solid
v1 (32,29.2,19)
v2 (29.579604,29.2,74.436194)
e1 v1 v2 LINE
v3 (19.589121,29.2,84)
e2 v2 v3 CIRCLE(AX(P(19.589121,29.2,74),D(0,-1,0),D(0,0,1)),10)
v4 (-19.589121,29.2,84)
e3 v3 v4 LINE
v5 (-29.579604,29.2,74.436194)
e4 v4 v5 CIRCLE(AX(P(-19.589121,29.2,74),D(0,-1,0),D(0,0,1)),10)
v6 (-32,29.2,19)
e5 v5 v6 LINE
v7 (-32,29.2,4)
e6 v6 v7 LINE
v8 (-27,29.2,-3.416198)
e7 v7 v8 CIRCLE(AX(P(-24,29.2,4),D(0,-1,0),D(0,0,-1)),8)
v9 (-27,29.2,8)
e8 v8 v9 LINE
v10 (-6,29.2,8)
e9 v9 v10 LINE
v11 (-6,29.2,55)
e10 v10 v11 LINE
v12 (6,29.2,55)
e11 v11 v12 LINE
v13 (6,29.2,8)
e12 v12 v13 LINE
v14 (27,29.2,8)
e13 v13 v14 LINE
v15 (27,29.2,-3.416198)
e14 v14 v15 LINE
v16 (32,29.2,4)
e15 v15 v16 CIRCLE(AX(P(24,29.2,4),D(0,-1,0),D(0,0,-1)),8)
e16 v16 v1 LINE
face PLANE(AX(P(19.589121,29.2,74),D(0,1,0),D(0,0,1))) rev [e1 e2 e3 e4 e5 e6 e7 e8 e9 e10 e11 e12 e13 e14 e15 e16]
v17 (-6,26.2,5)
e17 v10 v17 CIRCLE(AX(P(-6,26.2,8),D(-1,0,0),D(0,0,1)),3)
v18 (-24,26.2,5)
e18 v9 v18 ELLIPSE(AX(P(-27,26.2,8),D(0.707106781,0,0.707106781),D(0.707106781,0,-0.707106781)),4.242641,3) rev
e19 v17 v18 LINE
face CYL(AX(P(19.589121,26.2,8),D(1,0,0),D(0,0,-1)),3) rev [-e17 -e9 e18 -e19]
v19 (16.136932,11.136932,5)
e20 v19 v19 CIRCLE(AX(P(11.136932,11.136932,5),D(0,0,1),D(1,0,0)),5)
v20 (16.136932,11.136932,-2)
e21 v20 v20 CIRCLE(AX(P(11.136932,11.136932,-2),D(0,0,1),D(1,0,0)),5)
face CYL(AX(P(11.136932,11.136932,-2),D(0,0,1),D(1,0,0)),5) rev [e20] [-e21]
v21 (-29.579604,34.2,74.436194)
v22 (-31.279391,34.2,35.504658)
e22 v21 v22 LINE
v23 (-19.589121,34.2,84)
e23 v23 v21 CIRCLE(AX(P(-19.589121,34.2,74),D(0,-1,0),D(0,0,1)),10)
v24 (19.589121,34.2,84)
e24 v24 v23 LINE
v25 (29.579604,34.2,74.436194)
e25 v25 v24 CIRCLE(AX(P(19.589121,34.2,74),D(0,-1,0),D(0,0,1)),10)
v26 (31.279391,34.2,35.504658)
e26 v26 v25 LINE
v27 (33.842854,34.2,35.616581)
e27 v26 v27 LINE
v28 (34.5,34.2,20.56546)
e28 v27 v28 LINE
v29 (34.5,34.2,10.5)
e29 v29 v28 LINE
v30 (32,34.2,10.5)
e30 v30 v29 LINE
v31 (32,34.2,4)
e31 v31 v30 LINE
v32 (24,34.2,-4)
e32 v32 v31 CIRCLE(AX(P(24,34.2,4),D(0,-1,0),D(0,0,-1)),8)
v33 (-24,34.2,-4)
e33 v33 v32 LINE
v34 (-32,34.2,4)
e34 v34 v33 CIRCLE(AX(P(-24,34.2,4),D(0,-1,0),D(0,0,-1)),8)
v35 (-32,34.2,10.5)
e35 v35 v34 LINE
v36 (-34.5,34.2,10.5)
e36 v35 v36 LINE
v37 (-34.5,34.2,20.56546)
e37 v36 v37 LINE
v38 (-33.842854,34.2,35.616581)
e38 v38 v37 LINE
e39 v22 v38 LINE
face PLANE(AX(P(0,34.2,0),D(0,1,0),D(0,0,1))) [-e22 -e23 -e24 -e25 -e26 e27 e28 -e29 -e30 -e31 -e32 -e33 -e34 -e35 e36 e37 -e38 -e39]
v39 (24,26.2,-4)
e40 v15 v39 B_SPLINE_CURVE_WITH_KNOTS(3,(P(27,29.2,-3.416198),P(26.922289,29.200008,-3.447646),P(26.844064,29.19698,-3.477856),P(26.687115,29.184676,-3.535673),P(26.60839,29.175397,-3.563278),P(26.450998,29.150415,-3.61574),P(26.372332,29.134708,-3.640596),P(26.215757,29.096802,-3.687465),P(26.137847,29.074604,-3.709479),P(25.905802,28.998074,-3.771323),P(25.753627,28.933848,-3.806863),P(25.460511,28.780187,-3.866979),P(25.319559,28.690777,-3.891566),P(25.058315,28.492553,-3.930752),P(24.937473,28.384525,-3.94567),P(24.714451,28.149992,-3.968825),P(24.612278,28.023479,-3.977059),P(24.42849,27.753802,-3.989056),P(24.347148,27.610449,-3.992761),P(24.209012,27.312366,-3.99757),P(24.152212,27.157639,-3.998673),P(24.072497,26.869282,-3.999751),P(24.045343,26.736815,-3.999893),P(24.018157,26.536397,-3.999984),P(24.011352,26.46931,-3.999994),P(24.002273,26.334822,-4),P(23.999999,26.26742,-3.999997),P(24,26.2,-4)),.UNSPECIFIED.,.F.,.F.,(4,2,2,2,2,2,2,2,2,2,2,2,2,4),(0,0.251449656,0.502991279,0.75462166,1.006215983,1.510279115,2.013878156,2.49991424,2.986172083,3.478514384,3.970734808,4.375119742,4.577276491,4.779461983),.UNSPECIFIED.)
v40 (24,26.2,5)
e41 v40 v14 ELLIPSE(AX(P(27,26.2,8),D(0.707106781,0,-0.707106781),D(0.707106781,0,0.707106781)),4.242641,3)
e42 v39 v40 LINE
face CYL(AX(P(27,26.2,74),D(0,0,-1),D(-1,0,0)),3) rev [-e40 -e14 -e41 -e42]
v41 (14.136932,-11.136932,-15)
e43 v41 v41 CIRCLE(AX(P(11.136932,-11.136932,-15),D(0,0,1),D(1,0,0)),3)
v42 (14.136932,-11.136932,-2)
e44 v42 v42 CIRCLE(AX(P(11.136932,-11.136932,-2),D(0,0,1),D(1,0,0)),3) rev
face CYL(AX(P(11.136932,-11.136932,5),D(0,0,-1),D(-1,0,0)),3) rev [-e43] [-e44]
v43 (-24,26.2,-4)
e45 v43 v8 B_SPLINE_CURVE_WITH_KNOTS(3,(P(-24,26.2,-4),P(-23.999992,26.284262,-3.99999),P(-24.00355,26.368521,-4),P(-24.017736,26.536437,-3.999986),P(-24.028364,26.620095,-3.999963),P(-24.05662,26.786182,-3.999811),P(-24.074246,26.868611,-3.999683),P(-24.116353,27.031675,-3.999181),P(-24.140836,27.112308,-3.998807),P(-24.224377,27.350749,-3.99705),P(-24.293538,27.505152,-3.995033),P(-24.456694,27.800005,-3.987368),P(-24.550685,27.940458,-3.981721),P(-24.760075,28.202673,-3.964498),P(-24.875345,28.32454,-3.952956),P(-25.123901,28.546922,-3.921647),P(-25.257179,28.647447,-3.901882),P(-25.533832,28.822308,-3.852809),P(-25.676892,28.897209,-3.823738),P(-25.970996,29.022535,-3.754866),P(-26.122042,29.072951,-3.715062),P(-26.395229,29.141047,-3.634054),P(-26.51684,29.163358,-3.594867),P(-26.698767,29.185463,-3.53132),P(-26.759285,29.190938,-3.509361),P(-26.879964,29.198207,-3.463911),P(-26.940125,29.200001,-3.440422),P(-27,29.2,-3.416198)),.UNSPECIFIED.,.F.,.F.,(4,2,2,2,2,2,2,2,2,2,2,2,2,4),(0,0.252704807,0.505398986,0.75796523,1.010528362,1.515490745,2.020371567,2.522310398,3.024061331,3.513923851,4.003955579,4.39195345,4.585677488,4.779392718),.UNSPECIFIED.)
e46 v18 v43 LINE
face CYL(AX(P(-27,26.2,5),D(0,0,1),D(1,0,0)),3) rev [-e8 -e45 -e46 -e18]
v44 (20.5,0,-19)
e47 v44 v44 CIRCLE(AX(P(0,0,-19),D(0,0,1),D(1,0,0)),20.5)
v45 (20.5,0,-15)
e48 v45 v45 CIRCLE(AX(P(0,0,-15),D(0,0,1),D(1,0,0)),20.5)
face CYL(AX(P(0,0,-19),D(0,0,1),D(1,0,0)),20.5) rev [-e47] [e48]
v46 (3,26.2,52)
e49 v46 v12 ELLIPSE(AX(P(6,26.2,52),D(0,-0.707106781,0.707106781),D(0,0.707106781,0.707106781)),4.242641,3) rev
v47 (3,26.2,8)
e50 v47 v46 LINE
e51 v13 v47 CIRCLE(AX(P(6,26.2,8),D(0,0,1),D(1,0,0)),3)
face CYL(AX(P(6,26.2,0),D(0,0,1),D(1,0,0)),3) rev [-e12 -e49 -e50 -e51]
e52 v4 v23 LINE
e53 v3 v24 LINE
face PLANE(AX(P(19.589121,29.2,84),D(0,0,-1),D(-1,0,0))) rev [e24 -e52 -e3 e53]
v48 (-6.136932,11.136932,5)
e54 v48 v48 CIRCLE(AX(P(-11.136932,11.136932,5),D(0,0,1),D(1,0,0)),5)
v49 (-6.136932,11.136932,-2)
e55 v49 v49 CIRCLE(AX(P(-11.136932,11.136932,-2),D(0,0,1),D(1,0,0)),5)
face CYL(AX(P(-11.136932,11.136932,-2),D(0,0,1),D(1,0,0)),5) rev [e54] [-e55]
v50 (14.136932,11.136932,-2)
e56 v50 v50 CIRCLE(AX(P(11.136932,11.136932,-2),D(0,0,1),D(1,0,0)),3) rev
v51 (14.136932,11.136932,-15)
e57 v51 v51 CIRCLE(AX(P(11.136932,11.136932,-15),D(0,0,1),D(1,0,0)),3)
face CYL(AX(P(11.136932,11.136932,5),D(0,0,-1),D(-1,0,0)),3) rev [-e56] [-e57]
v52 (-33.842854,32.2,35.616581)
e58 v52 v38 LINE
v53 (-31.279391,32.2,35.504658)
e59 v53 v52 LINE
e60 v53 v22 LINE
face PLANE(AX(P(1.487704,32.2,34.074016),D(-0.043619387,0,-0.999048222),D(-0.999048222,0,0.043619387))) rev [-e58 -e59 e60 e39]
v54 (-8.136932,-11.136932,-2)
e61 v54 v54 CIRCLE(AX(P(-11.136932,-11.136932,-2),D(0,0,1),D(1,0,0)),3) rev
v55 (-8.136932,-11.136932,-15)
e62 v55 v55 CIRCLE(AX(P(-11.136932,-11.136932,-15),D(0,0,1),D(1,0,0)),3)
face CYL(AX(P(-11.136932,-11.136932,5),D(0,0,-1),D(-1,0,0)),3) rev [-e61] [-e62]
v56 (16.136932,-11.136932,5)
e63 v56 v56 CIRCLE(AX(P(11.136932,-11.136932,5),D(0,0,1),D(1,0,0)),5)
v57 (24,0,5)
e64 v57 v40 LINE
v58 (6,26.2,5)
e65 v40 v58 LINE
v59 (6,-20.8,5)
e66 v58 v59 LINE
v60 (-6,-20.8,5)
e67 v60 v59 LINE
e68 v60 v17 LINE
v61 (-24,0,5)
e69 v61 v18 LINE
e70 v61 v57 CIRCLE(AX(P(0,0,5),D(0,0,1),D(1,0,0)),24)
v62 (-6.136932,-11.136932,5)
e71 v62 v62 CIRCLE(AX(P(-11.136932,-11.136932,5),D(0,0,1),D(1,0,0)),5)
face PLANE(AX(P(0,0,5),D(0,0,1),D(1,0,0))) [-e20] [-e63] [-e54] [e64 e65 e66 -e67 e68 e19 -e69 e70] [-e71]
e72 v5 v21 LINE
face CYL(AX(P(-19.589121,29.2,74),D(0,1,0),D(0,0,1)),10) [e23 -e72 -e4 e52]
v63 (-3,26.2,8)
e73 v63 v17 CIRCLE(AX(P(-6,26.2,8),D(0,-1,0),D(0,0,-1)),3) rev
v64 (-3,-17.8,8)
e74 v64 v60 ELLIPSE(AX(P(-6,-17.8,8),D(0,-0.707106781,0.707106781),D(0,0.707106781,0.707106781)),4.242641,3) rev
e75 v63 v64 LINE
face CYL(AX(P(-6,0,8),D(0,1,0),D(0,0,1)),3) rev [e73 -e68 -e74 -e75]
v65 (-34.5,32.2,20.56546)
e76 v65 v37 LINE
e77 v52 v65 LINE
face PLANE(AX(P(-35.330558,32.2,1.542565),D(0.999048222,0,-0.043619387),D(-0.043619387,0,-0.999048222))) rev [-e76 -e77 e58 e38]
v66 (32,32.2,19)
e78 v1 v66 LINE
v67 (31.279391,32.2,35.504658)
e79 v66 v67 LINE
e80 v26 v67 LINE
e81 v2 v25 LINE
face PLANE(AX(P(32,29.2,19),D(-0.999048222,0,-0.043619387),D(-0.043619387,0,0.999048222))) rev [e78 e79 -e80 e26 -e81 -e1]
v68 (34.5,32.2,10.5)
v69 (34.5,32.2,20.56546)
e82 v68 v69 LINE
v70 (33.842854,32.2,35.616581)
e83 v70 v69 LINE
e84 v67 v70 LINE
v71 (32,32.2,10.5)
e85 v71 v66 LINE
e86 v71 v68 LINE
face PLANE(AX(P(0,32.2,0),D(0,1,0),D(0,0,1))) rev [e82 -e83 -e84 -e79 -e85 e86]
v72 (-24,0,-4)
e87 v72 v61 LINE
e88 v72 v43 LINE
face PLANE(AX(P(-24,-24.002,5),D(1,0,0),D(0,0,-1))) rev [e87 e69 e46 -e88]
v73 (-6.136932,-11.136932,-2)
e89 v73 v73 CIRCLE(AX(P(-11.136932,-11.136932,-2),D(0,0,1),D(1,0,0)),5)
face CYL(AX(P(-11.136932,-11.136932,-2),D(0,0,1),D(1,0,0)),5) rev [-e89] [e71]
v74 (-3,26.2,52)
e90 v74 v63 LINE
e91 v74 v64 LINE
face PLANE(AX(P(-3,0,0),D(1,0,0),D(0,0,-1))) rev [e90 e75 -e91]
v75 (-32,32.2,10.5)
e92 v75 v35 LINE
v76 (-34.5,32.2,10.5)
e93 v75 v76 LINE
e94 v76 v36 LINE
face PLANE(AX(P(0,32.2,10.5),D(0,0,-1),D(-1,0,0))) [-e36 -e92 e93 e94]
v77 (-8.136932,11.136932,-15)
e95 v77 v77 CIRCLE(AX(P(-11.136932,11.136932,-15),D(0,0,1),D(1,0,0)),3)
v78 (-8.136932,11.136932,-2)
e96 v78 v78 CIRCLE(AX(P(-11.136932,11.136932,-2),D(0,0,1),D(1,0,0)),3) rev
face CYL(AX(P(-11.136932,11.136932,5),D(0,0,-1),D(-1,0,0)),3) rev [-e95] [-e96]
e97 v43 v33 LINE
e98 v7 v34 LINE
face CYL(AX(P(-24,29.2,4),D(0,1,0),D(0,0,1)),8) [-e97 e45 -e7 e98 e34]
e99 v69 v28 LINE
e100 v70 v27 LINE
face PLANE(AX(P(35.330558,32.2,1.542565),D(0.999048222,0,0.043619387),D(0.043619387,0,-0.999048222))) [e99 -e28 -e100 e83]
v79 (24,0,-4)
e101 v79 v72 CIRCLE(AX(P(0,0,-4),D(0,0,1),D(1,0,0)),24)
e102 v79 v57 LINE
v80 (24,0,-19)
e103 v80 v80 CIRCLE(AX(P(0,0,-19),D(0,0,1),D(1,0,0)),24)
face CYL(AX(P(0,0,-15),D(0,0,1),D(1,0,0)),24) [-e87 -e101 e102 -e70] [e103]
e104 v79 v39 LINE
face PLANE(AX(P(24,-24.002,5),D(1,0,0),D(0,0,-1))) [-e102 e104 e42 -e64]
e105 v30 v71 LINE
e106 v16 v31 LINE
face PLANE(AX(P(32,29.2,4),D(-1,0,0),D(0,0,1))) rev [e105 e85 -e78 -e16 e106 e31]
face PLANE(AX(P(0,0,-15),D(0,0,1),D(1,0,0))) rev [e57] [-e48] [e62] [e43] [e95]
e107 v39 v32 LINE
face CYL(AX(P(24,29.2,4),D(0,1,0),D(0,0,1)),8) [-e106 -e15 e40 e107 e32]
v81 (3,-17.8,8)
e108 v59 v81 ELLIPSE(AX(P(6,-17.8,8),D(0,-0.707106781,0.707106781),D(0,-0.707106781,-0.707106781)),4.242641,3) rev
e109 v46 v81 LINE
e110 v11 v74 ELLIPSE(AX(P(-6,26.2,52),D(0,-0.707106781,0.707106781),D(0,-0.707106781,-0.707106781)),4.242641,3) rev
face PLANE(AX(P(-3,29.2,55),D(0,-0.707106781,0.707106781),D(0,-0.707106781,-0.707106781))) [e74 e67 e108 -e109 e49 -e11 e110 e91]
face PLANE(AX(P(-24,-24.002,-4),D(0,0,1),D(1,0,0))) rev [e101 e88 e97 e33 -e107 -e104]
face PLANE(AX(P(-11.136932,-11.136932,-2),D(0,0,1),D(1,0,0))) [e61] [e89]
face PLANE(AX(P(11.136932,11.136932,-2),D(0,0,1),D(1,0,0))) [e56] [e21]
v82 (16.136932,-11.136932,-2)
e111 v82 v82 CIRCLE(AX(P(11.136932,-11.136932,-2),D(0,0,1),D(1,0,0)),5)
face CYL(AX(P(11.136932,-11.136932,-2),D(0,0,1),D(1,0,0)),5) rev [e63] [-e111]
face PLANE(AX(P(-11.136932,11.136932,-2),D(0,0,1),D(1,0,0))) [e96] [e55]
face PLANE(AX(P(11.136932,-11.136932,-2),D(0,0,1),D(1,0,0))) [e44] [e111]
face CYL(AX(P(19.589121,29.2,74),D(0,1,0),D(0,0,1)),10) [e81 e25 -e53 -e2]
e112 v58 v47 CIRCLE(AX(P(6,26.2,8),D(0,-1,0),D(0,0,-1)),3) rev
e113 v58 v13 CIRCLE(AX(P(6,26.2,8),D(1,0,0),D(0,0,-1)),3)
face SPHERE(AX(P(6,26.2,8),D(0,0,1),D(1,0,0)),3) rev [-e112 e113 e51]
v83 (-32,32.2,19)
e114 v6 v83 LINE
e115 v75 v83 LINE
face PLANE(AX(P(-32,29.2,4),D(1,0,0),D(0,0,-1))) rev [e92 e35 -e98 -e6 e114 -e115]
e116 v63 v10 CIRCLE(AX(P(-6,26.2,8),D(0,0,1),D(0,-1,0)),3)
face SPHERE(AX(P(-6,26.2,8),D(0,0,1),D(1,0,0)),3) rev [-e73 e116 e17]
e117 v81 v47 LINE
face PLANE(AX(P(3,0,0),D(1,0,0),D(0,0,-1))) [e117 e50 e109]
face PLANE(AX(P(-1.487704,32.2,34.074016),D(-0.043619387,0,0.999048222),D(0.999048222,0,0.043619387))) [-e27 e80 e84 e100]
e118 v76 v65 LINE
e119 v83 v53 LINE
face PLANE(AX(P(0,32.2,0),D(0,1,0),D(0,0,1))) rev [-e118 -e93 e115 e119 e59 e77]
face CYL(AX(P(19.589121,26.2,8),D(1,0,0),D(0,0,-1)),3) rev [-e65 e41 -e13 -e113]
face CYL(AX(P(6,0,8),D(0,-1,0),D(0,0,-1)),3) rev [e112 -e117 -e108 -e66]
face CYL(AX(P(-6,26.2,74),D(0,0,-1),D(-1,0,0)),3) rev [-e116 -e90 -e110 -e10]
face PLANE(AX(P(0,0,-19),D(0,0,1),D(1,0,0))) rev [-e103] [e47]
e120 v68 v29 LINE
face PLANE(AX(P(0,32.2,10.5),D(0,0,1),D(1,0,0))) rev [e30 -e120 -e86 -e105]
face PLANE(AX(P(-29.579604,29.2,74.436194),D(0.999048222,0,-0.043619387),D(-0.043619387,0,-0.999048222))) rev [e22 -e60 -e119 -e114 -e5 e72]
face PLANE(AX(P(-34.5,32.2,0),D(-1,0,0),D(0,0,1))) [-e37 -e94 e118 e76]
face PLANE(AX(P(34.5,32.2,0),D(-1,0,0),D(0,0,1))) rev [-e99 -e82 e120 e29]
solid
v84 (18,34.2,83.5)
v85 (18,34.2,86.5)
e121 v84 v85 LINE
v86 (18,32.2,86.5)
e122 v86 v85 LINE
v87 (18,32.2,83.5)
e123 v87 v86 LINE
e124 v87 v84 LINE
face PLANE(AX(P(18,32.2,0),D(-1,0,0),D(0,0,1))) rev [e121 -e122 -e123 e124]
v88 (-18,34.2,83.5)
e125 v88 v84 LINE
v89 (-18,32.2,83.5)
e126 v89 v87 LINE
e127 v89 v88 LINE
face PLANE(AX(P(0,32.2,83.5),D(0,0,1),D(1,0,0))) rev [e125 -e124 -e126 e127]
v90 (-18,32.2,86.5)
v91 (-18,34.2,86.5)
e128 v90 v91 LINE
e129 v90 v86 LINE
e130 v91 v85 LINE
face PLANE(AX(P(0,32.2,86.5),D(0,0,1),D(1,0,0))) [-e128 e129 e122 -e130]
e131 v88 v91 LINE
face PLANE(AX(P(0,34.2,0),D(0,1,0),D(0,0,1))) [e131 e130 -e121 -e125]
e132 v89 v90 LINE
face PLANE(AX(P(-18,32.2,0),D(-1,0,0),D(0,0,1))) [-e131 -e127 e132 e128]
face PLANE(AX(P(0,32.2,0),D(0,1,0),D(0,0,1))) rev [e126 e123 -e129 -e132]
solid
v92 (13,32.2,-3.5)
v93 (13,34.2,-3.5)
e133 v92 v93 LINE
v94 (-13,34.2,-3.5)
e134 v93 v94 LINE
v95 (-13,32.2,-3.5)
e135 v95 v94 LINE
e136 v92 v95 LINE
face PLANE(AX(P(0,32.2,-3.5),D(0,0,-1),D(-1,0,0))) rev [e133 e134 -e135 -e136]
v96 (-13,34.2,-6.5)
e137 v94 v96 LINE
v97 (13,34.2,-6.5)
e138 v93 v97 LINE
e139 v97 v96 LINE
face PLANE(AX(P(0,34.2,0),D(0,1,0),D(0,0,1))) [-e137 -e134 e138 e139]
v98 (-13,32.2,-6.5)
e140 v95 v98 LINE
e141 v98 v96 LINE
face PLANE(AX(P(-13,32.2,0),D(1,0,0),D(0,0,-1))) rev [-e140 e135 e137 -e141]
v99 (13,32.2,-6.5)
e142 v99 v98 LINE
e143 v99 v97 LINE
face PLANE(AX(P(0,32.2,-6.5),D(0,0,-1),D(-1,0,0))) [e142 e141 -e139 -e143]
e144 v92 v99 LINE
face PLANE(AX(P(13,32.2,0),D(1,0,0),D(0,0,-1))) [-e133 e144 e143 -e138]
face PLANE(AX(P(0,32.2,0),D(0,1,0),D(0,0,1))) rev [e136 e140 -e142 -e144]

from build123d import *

# Parameters (mm, degrees)
BOSS_EXTRUDE3_DEPTH      = 5
BOSS_EXTRUDE3_DEPTH_BACK = 15
SKETCH1_R                = 24
SKETCH1_R_2              = 20.5
BOSS_EXTRUDE4_DEPTH      = 5
BOSS_EXTRUDE4_DEPTH_BACK = 19
SKETCH1_5_R              = 24
SKETCH1_5_R_2            = 20.5
CUT_EXTRUDE1_DEPTH       = 40.395431207
CUT_EXTRUDE1_DEPTH_BACK  = 40.395431207
SKETCH3_R                = 3
SKETCH7_W                = 36
SKETCH7_H                = 3
BOSS_EXTRUDE6_DEPTH      = 2
SKETCH7_W_2              = 26
BOSS_EXTRUDE6_2_DEPTH    = 2
BOSS_EXTRUDE6_3_DEPTH    = 2
BOSS_EXTRUDE6_4_DEPTH    = 2
BOSS_EXTRUDE7_DEPTH      = 5
BOSS_EXTRUDE8_REACH      = 109.251
BOSS_EXTRUDE8_END_RADIUS = 24
SKETCH8_W                = 48
SKETCH8_H                = 9
BOSS_EXTRUDE9_DEPTH      = 3
BOSS_EXTRUDE9_DEPTH_BACK = 3
FILLET1_R                = 3
SKETCH11_R               = 5
CUT_EXTRUDE3_DEPTH       = 7


with BuildPart() as part:
    # Sketch1 → Boss-Extrude3 (new, two sides: drawn at the far end of the back side and taken through both)
    # profile 1 of 2: a face of its own
    with BuildSketch(Plane.XY.offset(-BOSS_EXTRUDE3_DEPTH_BACK)):
        Circle(SKETCH1_R)
        Circle(SKETCH1_R_2, mode=Mode.SUBTRACT)
    # profile 2 of 2: a face of its own
    with BuildSketch(Plane.XY.offset(-BOSS_EXTRUDE3_DEPTH_BACK)):
        Circle(SKETCH1_R_2)
    extrude(amount=BOSS_EXTRUDE3_DEPTH + BOSS_EXTRUDE3_DEPTH_BACK)

    # Sketch1<5> → Boss-Extrude4 (add, two sides: drawn at the far end of the back side and taken through both)
    with BuildSketch(Plane.XY.offset(-BOSS_EXTRUDE4_DEPTH_BACK)):
        Circle(SKETCH1_5_R)
        Circle(SKETCH1_5_R_2, mode=Mode.SUBTRACT)
    extrude(amount=BOSS_EXTRUDE4_DEPTH + BOSS_EXTRUDE4_DEPTH_BACK)

    # Sketch3 → Cut-Extrude1 (cut, two sides: drawn at the far end of the back side and taken through both)
    with BuildSketch(Plane(origin=(0, 0, -15), x_dir=(-1, 0, 0), z_dir=(0, 0, -1)).offset(-CUT_EXTRUDE1_DEPTH_BACK)):
        with Locations((11.136931804, 11.136931804)):
            Circle(SKETCH3_R)
        with Locations((11.136931804, -11.136931804)):
            Circle(SKETCH3_R)
        with Locations((-11.136931804, -11.136931804)):
            Circle(SKETCH3_R)
        with Locations((-11.136931804, 11.136931804)):
            Circle(SKETCH3_R)
    extrude(amount=CUT_EXTRUDE1_DEPTH + CUT_EXTRUDE1_DEPTH_BACK, mode=Mode.SUBTRACT)



with BuildPart() as body_2:
    # Sketch7 → Boss-Extrude6 (new body)
    with BuildSketch(Plane(origin=(0, 34.2, -5.3), x_dir=(1, 0, 0), z_dir=(0, -1, 0))):
        with Locations((0, 90.3)):
            Rectangle(SKETCH7_W, SKETCH7_H)
    extrude(amount=BOSS_EXTRUDE6_DEPTH)


with BuildPart() as body_3:
    # Sketch7 → Boss-Extrude6 2 (new body)
    with BuildSketch(Plane(origin=(0, 34.2, -5.3), x_dir=(1, 0, 0), z_dir=(0, -1, 0))):
        with Locations((0, 0.3)):
            Rectangle(SKETCH7_W_2, SKETCH7_H)
    extrude(amount=BOSS_EXTRUDE6_2_DEPTH)


with BuildPart() as body_4:
    # Sketch7 → Boss-Extrude6 3 (new body)
    with BuildSketch(Plane(origin=(0, 34.2, -5.3), x_dir=(1, 0, 0), z_dir=(0, -1, 0))):
        Polygon((31.5, 25.8), (30.84570919, 40.785723324), (33.842853854, 40.916581486), (34.5, 25.865460233), (34.5, 15.8), (31.5, 15.8), align=None)
    extrude(amount=BOSS_EXTRUDE6_3_DEPTH)



with BuildPart() as body_5:
    # Sketch7 → Boss-Extrude6 4 (new body)
    with BuildSketch(Plane(origin=(0, 34.2, -5.3), x_dir=(1, 0, 0), z_dir=(0, -1, 0))):
        Polygon((-31.5, 25.8), (-31.5, 15.8), (-34.5, 15.8), (-34.5, 25.865460233), (-33.842853854, 40.916581486), (-30.84570919, 40.785723324), align=None)
    extrude(amount=BOSS_EXTRUDE6_4_DEPTH)


with BuildPart() as body_4_1:
    add(body_4.part)

    add(body_5.part)  # Boss-Extrude7 merges body 5
    # Sketch6 → Boss-Extrude7 (add)
    with BuildSketch(Plane(origin=(0, 34.2, 4.7), x_dir=(1, 0, 0), z_dir=(0, -1, 0))):
        with BuildLine():
            Line((32, -0.7), (32, 14.3))
            Line((32, 14.3), (29.579603504, 69.736193874))
            ThreePointArc((29.579603504, 69.736193874), (26.504251846, 76.523639621), (19.589121288, 79.3))
            Line((19.589121288, 79.3), (-19.589121288, 79.3))
            ThreePointArc((-19.589121288, 79.3), (-26.504251846, 76.523639621), (-29.579603504, 69.736193874))
            Line((-29.579603504, 69.736193874), (-32, 14.3))
            Line((-32, 14.3), (-32, -0.7))
            ThreePointArc((-32, -0.7), (-29.656854249, -6.356854249), (-24, -8.7))
            Line((-24, -8.7), (24, -8.7))
            ThreePointArc((24, -8.7), (29.656854249, -6.356854249), (32, -0.7))
        make_face()
    extrude(amount=BOSS_EXTRUDE7_DEPTH)


with BuildPart() as part_1:
    add(part.part)

    add(body_4_1.part)  # Boss-Extrude8 merges body 4
    # Boss-Extrude8: up to this cylinder (the profile starts outside it)
    boss_extrude8_end = Plane(origin=(0, 0, 0.5), z_dir=(0, 0, 1)) * Cylinder(BOSS_EXTRUDE8_END_RADIUS, 267.502, mode=Mode.PRIVATE)
    # Sketch8 → Boss-Extrude8 (add, up to the surface)
    with BuildSketch(Plane.XZ.offset(-29.2), mode=Mode.PRIVATE) as boss_extrude8_sk1:
        with Locations((0, 0.5)):
            Rectangle(SKETCH8_W, SKETCH8_H)
    boss_extrude8_tool1 = extrude(boss_extrude8_sk1.sketch, amount=BOSS_EXTRUDE8_REACH, mode=Mode.PRIVATE) - boss_extrude8_end
    add(boss_extrude8_tool1.solids().sort_by_distance((0, 29.2, 0.5))[0])

    # Sketch9 → Boss-Extrude9 (add, two sides: drawn at the far end of the back side and taken through both)
    with BuildSketch(Plane(origin=(0, 0, 0), x_dir=(0, 0, -1), z_dir=(1, 0, 0)).offset(-BOSS_EXTRUDE9_DEPTH_BACK)):
        Polygon((-5, 29.2), (-55, 29.2), (-5, -20.8), align=None)
    extrude(amount=BOSS_EXTRUDE9_DEPTH + BOSS_EXTRUDE9_DEPTH_BACK)

    # Fillet1
    # the kernel refuses this fillet: 3 mm, written as the material it adds along each edge
    with BuildSketch(Plane(origin=(-6, 26.2, 8), x_dir=(1, 0, 0), z_dir=(0, 0, -1))) as fillet1_piece_1_section:
        Polygon((0, 0), (FILLET1_R * 1.02, 0), (FILLET1_R * 1.02, -FILLET1_R * 1.02), (0, -FILLET1_R * 1.02), align=None)
    fillet1_piece_1 = extrude(amount=FILLET1_R * 1.02, mode=Mode.PRIVATE)
    fillet1_piece_1 = fillet1_piece_1 - Plane(origin=(-6, 26.2, 8), x_dir=(-0.7071067811865475, -0.7071067811865475, 0), z_dir=(0, 0, -1)) * Sphere(FILLET1_R, mode=Mode.PRIVATE)
    add(fillet1_piece_1)
    with BuildSketch(Plane(origin=(6, 26.2, 8), x_dir=(-1, 0, 0), z_dir=(0, 0, -1))) as fillet1_piece_2_section:
        Polygon((0, 0), (FILLET1_R * 1.02, 0), (FILLET1_R * 1.02, FILLET1_R * 1.02), (0, FILLET1_R * 1.02), align=None)
    fillet1_piece_2 = extrude(amount=FILLET1_R * 1.02, mode=Mode.PRIVATE)
    fillet1_piece_2 = fillet1_piece_2 - Plane(origin=(6, 26.2, 8), x_dir=(0.7071067811865475, -0.7071067811865475, 0), z_dir=(0, 0, -1)) * Sphere(FILLET1_R, mode=Mode.PRIVATE)
    add(fillet1_piece_2)
    with BuildSketch(Plane(origin=(-6, 29.2, 5), x_dir=(0, 0, 1), z_dir=(-1, 0, 0)), Plane(origin=(24, 29.2, 5), x_dir=(0, 0, 1), z_dir=(-1, 0, 0))) as fillet1_piece_3:
        with BuildLine():
            CenterArc((FILLET1_R, -FILLET1_R), FILLET1_R, 90, 90)
            Line((0, -FILLET1_R), (-FILLET1_R * 0.02, -FILLET1_R))
            Line((-FILLET1_R * 0.02, -FILLET1_R), (-FILLET1_R * 0.02, FILLET1_R * 0.02))
            Line((-FILLET1_R * 0.02, FILLET1_R * 0.02), (FILLET1_R, FILLET1_R * 0.02))
            Line((FILLET1_R, FILLET1_R * 0.02), (FILLET1_R, 0))
        make_face()
    extrude(amount=18)
    with BuildSketch(Plane(origin=(24, 29.2, -4), x_dir=(0, -1, 0), z_dir=(0, 0, 1))) as fillet1_piece_4_section:
        with BuildLine():
            CenterArc((FILLET1_R, FILLET1_R), FILLET1_R, 180, 90)
            Line((0, FILLET1_R), (-FILLET1_R * 0.02, FILLET1_R))
            Line((-FILLET1_R * 0.02, FILLET1_R), (-FILLET1_R * 0.02, -FILLET1_R * 0.02))
            Line((-FILLET1_R * 0.02, -FILLET1_R * 0.02), (FILLET1_R, -FILLET1_R * 0.02))
            Line((FILLET1_R, -FILLET1_R * 0.02), (FILLET1_R, 0))
        make_face()
    fillet1_piece_4 = extrude(amount=9, mode=Mode.PRIVATE)
    fillet1_piece_4 = fillet1_piece_4 & Plane(origin=(24, 28.51771495, 4), x_dir=(0, 0, -1), z_dir=(0, 1, 0)) * Cylinder(8, 30, mode=Mode.PRIVATE)
    add(fillet1_piece_4)
    with BuildSketch(Plane(origin=(-24, 29.2, 5), x_dir=(0, -1, 0), z_dir=(0, 0, -1))) as fillet1_piece_5_section:
        with BuildLine():
            CenterArc((FILLET1_R, FILLET1_R), FILLET1_R, 180, 90)
            Line((0, FILLET1_R), (-FILLET1_R * 0.02, FILLET1_R))
            Line((-FILLET1_R * 0.02, FILLET1_R), (-FILLET1_R * 0.02, -FILLET1_R * 0.02))
            Line((-FILLET1_R * 0.02, -FILLET1_R * 0.02), (FILLET1_R, -FILLET1_R * 0.02))
            Line((FILLET1_R, -FILLET1_R * 0.02), (FILLET1_R, 0))
        make_face()
    fillet1_piece_5 = extrude(amount=9, mode=Mode.PRIVATE)
    fillet1_piece_5 = fillet1_piece_5 & Plane(origin=(-24, 28.517715039, 4), x_dir=(-1, 0, 0), z_dir=(0, 1, 0)) * Cylinder(8, 30, mode=Mode.PRIVATE)
    add(fillet1_piece_5)
    with BuildSketch(Plane(origin=(-3, -28.3, 5), x_dir=(-1, 0, 0), z_dir=(0, 1, 0))) as fillet1_piece_6_section:
        with BuildLine():
            CenterArc((FILLET1_R, FILLET1_R), FILLET1_R, 180, 90)
            Line((0, FILLET1_R), (-FILLET1_R * 0.02, FILLET1_R))
            Line((-FILLET1_R * 0.02, FILLET1_R), (-FILLET1_R * 0.02, -FILLET1_R * 0.02))
            Line((-FILLET1_R * 0.02, -FILLET1_R * 0.02), (FILLET1_R, -FILLET1_R * 0.02))
            Line((FILLET1_R, -FILLET1_R * 0.02), (FILLET1_R, 0))
        make_face()
    fillet1_piece_6 = extrude(amount=54.5, mode=Mode.PRIVATE)
    fillet1_piece_6 = split(fillet1_piece_6, bisect_by=Plane(origin=(-3.684520102, -8.5473837, 17.2526163), z_dir=(0, 0.7071067811865475, -0.7071067811865476)), keep=Keep.TOP, mode=Mode.PRIVATE)
    add(fillet1_piece_6)
    with BuildSketch(Plane(origin=(-3, 29.2, 8), x_dir=(-1, 0, 0), z_dir=(0, 0, 1))) as fillet1_piece_7_section:
        with BuildLine():
            CenterArc((FILLET1_R, FILLET1_R), FILLET1_R, 180, 90)
            Line((0, FILLET1_R), (-FILLET1_R * 0.02, FILLET1_R))
            Line((-FILLET1_R * 0.02, FILLET1_R), (-FILLET1_R * 0.02, -FILLET1_R * 0.02))
            Line((-FILLET1_R * 0.02, -FILLET1_R * 0.02), (FILLET1_R, -FILLET1_R * 0.02))
            Line((FILLET1_R, -FILLET1_R * 0.02), (FILLET1_R, 0))
        make_face()
    fillet1_piece_7 = extrude(amount=54.5, mode=Mode.PRIVATE)
    fillet1_piece_7 = split(fillet1_piece_7, bisect_by=Plane(origin=(-3.684520102, 16.9473837, 42.7473837), z_dir=(0, 0.7071067811865475, -0.7071067811865476)), keep=Keep.TOP, mode=Mode.PRIVATE)
    add(fillet1_piece_7)
    with BuildSketch(Plane(origin=(3, -28.3, 5), x_dir=(1, 0, 0), z_dir=(0, 1, 0))) as fillet1_piece_8_section:
        with BuildLine():
            CenterArc((FILLET1_R, -FILLET1_R), FILLET1_R, 90, 90)
            Line((0, -FILLET1_R), (-FILLET1_R * 0.02, -FILLET1_R))
            Line((-FILLET1_R * 0.02, -FILLET1_R), (-FILLET1_R * 0.02, FILLET1_R * 0.02))
            Line((-FILLET1_R * 0.02, FILLET1_R * 0.02), (FILLET1_R, FILLET1_R * 0.02))
            Line((FILLET1_R, FILLET1_R * 0.02), (FILLET1_R, 0))
        make_face()
    fillet1_piece_8 = extrude(amount=54.5, mode=Mode.PRIVATE)
    fillet1_piece_8 = split(fillet1_piece_8, bisect_by=Plane(origin=(3.684520102, -8.5473837, 17.2526163), z_dir=(0, 0.7071067811865475, -0.7071067811865476)), keep=Keep.TOP, mode=Mode.PRIVATE)
    add(fillet1_piece_8)
    with BuildSketch(Plane(origin=(3, 29.2, 8), x_dir=(1, 0, 0), z_dir=(0, 0, 1))) as fillet1_piece_9_section:
        with BuildLine():
            CenterArc((FILLET1_R, -FILLET1_R), FILLET1_R, 90, 90)
            Line((0, -FILLET1_R), (-FILLET1_R * 0.02, -FILLET1_R))
            Line((-FILLET1_R * 0.02, -FILLET1_R), (-FILLET1_R * 0.02, FILLET1_R * 0.02))
            Line((-FILLET1_R * 0.02, FILLET1_R * 0.02), (FILLET1_R, FILLET1_R * 0.02))
            Line((FILLET1_R, FILLET1_R * 0.02), (FILLET1_R, 0))
        make_face()
    fillet1_piece_9 = extrude(amount=54.5, mode=Mode.PRIVATE)
    fillet1_piece_9 = split(fillet1_piece_9, bisect_by=Plane(origin=(3.684520102, 16.9473837, 42.7473837), z_dir=(0, 0.7071067811865475, -0.7071067811865476)), keep=Keep.TOP, mode=Mode.PRIVATE)
    add(fillet1_piece_9)
    with BuildSketch(Plane(origin=(-24, 29.2, 12.5), x_dir=(0, -1, 0), z_dir=(0, 0, -1))) as fillet1_piece_10a_section:
        with BuildLine():
            CenterArc((FILLET1_R, FILLET1_R), FILLET1_R, 180, 90)
            Line((0, FILLET1_R), (-FILLET1_R * 0.02, FILLET1_R))
            Line((-FILLET1_R * 0.02, FILLET1_R), (-FILLET1_R * 0.02, -FILLET1_R * 0.02))
            Line((-FILLET1_R * 0.02, -FILLET1_R * 0.02), (FILLET1_R, -FILLET1_R * 0.02))
            Line((FILLET1_R, -FILLET1_R * 0.02), (FILLET1_R, 0))
        make_face()
    fillet1_piece_10a = extrude(amount=16.5, mode=Mode.PRIVATE)
    fillet1_piece_10a = fillet1_piece_10a & Plane(origin=(-24, 28.516822216, 4), x_dir=(-1, 0, 0), z_dir=(0, 1, 0)) * Cylinder(8, 45, mode=Mode.PRIVATE)
    fillet1_piece_10a = split(fillet1_piece_10a, bisect_by=Plane(origin=(-24.671174744, 28.516822216, 5), z_dir=(0, 0, 1)), keep=Keep.TOP, mode=Mode.PRIVATE)
    with BuildSketch(Plane(origin=(-6, 29.2, 5), x_dir=(0, 0, 1), z_dir=(-1, 0, 0))) as fillet1_piece_10b_section:
        with BuildLine():
            CenterArc((FILLET1_R, -FILLET1_R), FILLET1_R, 90, 90)
            Line((0, -FILLET1_R), (-FILLET1_R * 0.02, -FILLET1_R))
            Line((-FILLET1_R * 0.02, -FILLET1_R), (-FILLET1_R * 0.02, FILLET1_R * 0.02))
            Line((-FILLET1_R * 0.02, FILLET1_R * 0.02), (FILLET1_R, FILLET1_R * 0.02))
            Line((FILLET1_R, FILLET1_R * 0.02), (FILLET1_R, 0))
        make_face()
    fillet1_piece_10b = extrude(amount=25.5, mode=Mode.PRIVATE)
    fillet1_piece_10b = split(fillet1_piece_10b, bisect_by=Plane(origin=(-24, 28.520814657, 5.679185343), z_dir=(-1, 0, 0)), keep=Keep.TOP, mode=Mode.PRIVATE)
    fillet1_piece_10 = fillet1_piece_10a & fillet1_piece_10b
    add(fillet1_piece_10)
    with BuildSketch(Plane(origin=(24, 29.2, -4), x_dir=(0, -1, 0), z_dir=(0, 0, 1))) as fillet1_piece_11a_section:
        with BuildLine():
            CenterArc((FILLET1_R, FILLET1_R), FILLET1_R, 180, 90)
            Line((0, FILLET1_R), (-FILLET1_R * 0.02, FILLET1_R))
            Line((-FILLET1_R * 0.02, FILLET1_R), (-FILLET1_R * 0.02, -FILLET1_R * 0.02))
            Line((-FILLET1_R * 0.02, -FILLET1_R * 0.02), (FILLET1_R, -FILLET1_R * 0.02))
            Line((FILLET1_R, -FILLET1_R * 0.02), (FILLET1_R, 0))
        make_face()
    fillet1_piece_11a = extrude(amount=16.5, mode=Mode.PRIVATE)
    fillet1_piece_11a = fillet1_piece_11a & Plane(origin=(24, 28.516822319, 4), x_dir=(0, 0, -1), z_dir=(0, 1, 0)) * Cylinder(8, 45, mode=Mode.PRIVATE)
    fillet1_piece_11a = split(fillet1_piece_11a, bisect_by=Plane(origin=(24.671175029, 28.516822319, 5), z_dir=(0, 0, 1)), keep=Keep.TOP, mode=Mode.PRIVATE)
    with BuildSketch(Plane(origin=(31.5, 29.2, 5), x_dir=(0, 0, 1), z_dir=(-1, 0, 0))) as fillet1_piece_11b_section:
        with BuildLine():
            CenterArc((FILLET1_R, -FILLET1_R), FILLET1_R, 90, 90)
            Line((0, -FILLET1_R), (-FILLET1_R * 0.02, -FILLET1_R))
            Line((-FILLET1_R * 0.02, -FILLET1_R), (-FILLET1_R * 0.02, FILLET1_R * 0.02))
            Line((-FILLET1_R * 0.02, FILLET1_R * 0.02), (FILLET1_R, FILLET1_R * 0.02))
            Line((FILLET1_R, FILLET1_R * 0.02), (FILLET1_R, 0))
        make_face()
    fillet1_piece_11b = extrude(amount=25.5, mode=Mode.PRIVATE)
    fillet1_piece_11b = split(fillet1_piece_11b, bisect_by=Plane(origin=(24, 28.520814657, 5.679185343), z_dir=(1, 0, 0)), keep=Keep.TOP, mode=Mode.PRIVATE)
    fillet1_piece_11 = fillet1_piece_11a & fillet1_piece_11b
    add(fillet1_piece_11)

    # Sketch11 → Cut-Extrude3 (cut)
    with BuildSketch(Plane.XY.offset(5)):
        with Locations((-11.136931804, 11.136931804)):
            Circle(SKETCH11_R)
        with Locations((11.136931804, 11.136931804)):
            Circle(SKETCH11_R)
        with Locations((-11.136931804, -11.136931804)):
            Circle(SKETCH11_R)
        with Locations((11.136931804, -11.136931804)):
            Circle(SKETCH11_R)
    extrude(amount=-CUT_EXTRUDE3_DEPTH, mode=Mode.SUBTRACT)


solid = Compound([body_2.part, body_3.part, part_1.part])
